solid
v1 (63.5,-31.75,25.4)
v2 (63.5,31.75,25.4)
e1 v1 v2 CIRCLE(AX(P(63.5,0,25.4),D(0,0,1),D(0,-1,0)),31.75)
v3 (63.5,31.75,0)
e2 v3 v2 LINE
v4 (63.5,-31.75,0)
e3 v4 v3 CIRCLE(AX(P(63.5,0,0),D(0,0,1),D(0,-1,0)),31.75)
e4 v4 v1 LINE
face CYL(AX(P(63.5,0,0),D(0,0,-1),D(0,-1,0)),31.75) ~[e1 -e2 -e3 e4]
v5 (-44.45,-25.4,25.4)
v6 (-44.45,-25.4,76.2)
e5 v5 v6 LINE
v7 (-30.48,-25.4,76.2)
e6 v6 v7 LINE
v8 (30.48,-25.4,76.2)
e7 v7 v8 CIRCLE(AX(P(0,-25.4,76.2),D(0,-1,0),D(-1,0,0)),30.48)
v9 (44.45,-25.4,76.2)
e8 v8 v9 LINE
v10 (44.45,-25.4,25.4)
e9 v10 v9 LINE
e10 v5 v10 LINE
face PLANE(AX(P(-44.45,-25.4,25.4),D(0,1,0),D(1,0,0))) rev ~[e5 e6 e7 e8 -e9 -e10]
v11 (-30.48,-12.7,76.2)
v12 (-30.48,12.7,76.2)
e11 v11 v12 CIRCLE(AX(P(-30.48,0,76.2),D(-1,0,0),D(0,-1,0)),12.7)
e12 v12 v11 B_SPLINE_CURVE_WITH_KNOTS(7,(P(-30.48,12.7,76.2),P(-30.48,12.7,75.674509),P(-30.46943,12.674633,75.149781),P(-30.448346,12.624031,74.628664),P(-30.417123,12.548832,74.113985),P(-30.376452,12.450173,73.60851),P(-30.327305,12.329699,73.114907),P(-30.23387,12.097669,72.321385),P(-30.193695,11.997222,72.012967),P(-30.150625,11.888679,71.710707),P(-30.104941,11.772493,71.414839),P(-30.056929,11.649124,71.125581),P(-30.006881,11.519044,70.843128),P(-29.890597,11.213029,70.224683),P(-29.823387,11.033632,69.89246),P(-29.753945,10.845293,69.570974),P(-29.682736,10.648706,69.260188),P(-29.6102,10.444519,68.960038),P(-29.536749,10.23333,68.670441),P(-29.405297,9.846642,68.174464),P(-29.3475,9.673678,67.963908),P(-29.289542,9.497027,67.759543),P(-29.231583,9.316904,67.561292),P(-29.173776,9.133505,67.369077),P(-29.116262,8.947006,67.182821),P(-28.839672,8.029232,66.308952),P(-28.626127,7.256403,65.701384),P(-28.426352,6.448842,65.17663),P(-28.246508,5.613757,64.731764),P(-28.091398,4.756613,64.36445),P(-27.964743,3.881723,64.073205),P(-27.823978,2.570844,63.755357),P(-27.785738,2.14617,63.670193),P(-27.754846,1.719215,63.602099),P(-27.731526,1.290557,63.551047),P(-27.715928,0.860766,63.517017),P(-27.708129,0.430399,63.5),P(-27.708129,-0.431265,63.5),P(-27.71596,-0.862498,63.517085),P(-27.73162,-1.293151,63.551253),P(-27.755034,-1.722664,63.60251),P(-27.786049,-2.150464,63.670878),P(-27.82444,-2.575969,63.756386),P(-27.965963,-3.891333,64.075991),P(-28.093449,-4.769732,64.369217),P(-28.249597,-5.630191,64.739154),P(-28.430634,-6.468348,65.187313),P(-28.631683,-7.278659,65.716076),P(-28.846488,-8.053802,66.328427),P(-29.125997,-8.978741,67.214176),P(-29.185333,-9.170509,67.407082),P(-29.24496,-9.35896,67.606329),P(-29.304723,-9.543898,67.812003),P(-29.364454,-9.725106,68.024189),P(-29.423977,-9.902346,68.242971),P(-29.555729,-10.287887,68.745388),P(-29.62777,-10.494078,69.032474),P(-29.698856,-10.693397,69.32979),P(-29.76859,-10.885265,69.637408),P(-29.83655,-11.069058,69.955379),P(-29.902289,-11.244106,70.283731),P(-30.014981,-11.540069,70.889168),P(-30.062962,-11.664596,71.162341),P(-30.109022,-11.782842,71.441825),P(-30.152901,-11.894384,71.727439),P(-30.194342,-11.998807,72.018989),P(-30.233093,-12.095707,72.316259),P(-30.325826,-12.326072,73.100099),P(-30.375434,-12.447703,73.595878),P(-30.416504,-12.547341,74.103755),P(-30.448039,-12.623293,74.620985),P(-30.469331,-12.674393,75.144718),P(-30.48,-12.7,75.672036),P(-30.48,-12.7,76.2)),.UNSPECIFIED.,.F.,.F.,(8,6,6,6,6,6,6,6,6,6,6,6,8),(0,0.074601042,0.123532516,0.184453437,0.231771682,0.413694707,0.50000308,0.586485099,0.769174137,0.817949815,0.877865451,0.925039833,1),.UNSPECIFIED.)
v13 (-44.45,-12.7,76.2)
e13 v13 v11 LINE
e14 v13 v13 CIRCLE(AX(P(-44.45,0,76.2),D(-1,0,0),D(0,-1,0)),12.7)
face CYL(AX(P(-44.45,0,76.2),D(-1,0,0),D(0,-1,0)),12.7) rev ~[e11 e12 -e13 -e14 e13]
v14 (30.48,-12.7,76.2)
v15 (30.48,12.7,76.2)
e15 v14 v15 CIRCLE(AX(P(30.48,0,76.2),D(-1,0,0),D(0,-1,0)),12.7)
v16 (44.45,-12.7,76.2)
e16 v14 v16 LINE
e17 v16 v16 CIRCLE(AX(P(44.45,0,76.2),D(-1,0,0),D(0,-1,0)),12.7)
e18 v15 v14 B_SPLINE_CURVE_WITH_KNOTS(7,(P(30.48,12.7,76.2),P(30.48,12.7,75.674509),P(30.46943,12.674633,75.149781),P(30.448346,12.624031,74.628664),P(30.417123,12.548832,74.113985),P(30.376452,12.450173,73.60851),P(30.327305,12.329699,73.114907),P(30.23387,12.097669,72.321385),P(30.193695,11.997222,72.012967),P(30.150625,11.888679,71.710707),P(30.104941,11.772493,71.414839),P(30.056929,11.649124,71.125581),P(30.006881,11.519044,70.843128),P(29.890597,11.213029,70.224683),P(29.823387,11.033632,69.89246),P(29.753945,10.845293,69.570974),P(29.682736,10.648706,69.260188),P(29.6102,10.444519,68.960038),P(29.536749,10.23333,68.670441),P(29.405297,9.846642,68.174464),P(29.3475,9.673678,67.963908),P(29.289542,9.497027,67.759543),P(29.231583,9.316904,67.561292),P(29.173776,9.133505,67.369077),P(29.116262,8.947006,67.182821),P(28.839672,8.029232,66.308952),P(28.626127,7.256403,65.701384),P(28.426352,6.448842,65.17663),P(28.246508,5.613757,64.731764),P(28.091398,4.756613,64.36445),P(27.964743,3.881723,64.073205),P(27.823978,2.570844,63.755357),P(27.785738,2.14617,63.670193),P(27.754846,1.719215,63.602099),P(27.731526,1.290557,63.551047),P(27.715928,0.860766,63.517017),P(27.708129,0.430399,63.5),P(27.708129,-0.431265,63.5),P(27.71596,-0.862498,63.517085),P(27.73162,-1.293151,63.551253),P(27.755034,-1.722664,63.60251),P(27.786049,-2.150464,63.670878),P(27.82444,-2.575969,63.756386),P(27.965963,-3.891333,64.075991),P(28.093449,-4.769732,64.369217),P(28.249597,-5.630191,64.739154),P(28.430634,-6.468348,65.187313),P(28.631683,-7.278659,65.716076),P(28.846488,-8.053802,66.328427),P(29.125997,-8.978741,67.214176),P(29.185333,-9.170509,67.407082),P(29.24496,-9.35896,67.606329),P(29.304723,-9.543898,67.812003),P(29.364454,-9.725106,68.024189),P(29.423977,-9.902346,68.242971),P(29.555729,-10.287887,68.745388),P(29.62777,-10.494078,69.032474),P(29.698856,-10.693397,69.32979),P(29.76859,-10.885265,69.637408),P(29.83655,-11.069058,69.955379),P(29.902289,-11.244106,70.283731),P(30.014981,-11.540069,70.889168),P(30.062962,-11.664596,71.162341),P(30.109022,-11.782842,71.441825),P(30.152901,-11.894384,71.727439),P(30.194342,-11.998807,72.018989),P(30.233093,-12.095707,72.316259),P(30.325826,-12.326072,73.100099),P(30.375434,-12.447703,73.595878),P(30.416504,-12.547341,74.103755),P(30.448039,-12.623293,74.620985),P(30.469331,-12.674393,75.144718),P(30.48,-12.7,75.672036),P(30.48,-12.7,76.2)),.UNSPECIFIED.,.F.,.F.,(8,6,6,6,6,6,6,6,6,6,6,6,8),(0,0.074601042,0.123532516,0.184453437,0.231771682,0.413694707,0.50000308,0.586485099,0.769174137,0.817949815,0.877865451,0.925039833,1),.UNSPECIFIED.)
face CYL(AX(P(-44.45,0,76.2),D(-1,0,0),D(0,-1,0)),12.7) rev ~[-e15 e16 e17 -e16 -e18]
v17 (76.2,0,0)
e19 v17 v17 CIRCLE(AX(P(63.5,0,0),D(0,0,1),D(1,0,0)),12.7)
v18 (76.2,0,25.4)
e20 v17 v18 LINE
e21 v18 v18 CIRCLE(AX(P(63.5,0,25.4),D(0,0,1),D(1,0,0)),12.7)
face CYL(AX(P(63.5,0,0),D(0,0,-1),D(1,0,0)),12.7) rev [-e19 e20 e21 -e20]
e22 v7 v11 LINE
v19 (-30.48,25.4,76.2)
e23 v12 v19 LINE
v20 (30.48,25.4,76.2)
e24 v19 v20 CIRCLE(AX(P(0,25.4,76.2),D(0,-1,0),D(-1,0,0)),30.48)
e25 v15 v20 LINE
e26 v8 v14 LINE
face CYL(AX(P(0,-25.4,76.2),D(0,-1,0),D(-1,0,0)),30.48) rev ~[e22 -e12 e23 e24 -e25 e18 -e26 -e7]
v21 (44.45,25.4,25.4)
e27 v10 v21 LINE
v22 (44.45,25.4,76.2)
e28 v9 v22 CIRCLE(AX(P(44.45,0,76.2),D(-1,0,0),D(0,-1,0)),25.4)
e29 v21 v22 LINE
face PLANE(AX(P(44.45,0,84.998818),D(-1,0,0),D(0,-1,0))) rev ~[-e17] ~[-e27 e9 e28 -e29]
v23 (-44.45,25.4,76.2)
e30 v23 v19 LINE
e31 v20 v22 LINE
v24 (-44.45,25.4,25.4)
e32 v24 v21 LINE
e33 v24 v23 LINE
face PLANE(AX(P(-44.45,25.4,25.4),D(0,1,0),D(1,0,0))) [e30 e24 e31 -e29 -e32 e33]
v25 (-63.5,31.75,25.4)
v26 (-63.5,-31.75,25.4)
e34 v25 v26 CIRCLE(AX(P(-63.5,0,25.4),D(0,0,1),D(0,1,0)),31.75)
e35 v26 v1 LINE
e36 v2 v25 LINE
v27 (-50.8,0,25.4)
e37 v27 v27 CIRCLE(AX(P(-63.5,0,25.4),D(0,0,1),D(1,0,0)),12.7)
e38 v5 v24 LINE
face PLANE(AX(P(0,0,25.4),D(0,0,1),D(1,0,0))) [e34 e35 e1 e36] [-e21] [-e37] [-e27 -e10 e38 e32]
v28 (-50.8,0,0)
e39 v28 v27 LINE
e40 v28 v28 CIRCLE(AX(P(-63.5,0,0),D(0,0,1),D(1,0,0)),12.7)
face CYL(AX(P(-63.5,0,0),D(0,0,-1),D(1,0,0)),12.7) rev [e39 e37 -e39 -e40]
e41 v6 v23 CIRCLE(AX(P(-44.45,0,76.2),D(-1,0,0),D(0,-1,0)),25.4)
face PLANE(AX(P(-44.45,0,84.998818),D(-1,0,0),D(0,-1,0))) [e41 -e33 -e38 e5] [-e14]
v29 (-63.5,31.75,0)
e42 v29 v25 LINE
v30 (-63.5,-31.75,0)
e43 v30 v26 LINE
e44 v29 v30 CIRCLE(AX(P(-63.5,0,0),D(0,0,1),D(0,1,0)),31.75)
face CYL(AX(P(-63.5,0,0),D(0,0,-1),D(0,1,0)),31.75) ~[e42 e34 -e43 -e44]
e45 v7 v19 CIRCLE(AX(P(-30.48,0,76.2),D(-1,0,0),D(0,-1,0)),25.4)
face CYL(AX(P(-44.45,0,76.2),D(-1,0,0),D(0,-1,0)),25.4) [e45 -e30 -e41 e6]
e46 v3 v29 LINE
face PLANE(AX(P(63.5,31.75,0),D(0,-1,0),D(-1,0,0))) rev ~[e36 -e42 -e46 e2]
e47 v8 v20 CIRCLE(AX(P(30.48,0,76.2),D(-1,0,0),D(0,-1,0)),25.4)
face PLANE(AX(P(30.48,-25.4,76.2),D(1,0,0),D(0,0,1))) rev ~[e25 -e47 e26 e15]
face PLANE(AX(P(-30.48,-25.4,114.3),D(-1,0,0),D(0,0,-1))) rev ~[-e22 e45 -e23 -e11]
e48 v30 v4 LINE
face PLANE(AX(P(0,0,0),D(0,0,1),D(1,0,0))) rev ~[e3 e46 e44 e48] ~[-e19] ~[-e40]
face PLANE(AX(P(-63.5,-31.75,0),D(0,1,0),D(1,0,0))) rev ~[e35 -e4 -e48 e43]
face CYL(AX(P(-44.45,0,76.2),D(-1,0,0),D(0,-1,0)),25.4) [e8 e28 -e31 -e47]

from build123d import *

# Parameters (mm, degrees)
F0_R     = 12.7
F1_DEPTH = 25.4
F2_W     = 88.9
F2_H     = 50.8
F3_DEPTH = 50.8
F5_DEPTH = 88.9
F7_DEPTH = 75.946
F8_R     = 12.7
F9_DEPTH = 112.776


# Not quite as in the source:
# - a feature names something its author has since deleted; it is built from what else it names


with BuildPart() as f1:
    # F0 (on Top) → F1 (new body)
    with BuildSketch(Plane.XY):
        with BuildLine():
            Line((-63.5, -31.75), (63.5, -31.75))
            ThreePointArc((63.5, -31.75), (95.25, 0), (63.5, 31.75))
            Line((63.5, 31.75), (-63.5, 31.75))
            ThreePointArc((-63.5, 31.75), (-95.25, 0), (-63.5, -31.75))
        make_face()
        with Locations((-63.5, 0)):
            Circle(F0_R, mode=Mode.SUBTRACT)
        with Locations((63.5, 0)):
            Circle(F0_R, mode=Mode.SUBTRACT)
    extrude(amount=F1_DEPTH)

    # F2 (on face) → F3 (join)
    with BuildSketch(Plane.XY.offset(25.4)):
        Rectangle(F2_W, F2_H)
    extrude(amount=F3_DEPTH)

    # F4 (on face) → F5 (join)
    with BuildSketch(Plane(origin=(-44.45, 0, 0), x_dir=(0, -1, 0), z_dir=(-1, 0, 0))):
        with BuildLine():
            Line((-25.4, 76.2), (25.4, 76.2))
            ThreePointArc((25.4, 76.2), (0, 101.6), (-25.4, 76.2))
        make_face()
    extrude(amount=-F5_DEPTH)

    # F6 (on face) → F7 (cut)
    with BuildSketch(Plane.XZ.offset(25.4)):
        with BuildLine():
            Line((-30.48, 76.2), (30.48, 76.2))
            ThreePointArc((30.48, 76.2), (0, 106.68), (-30.48, 76.2))
        make_face()
        with BuildLine():
            ThreePointArc((-30.48, 76.2), (0, 45.72), (30.48, 76.2))
            Line((30.48, 76.2), (-30.48, 76.2))
        make_face()
        with BuildLine():
            Line((30.48, 76.2), (30.48, 114.3))
            Line((30.48, 114.3), (-30.48, 114.3))
            Line((-30.48, 114.3), (-30.48, 76.2))
            ThreePointArc((-30.48, 76.2), (0, 106.68), (30.48, 76.2))
        make_face()
    extrude(amount=-F7_DEPTH, mode=Mode.SUBTRACT)

    # F8 (on face) → F9 (cut)
    with BuildSketch(Plane(origin=(-44.45, 0, 0), x_dir=(0, -1, 0), z_dir=(-1, 0, 0))):
        with Locations((0, 76.2)):
            Circle(F8_R)
    extrude(amount=-F9_DEPTH, mode=Mode.SUBTRACT)


solid = f1.part
